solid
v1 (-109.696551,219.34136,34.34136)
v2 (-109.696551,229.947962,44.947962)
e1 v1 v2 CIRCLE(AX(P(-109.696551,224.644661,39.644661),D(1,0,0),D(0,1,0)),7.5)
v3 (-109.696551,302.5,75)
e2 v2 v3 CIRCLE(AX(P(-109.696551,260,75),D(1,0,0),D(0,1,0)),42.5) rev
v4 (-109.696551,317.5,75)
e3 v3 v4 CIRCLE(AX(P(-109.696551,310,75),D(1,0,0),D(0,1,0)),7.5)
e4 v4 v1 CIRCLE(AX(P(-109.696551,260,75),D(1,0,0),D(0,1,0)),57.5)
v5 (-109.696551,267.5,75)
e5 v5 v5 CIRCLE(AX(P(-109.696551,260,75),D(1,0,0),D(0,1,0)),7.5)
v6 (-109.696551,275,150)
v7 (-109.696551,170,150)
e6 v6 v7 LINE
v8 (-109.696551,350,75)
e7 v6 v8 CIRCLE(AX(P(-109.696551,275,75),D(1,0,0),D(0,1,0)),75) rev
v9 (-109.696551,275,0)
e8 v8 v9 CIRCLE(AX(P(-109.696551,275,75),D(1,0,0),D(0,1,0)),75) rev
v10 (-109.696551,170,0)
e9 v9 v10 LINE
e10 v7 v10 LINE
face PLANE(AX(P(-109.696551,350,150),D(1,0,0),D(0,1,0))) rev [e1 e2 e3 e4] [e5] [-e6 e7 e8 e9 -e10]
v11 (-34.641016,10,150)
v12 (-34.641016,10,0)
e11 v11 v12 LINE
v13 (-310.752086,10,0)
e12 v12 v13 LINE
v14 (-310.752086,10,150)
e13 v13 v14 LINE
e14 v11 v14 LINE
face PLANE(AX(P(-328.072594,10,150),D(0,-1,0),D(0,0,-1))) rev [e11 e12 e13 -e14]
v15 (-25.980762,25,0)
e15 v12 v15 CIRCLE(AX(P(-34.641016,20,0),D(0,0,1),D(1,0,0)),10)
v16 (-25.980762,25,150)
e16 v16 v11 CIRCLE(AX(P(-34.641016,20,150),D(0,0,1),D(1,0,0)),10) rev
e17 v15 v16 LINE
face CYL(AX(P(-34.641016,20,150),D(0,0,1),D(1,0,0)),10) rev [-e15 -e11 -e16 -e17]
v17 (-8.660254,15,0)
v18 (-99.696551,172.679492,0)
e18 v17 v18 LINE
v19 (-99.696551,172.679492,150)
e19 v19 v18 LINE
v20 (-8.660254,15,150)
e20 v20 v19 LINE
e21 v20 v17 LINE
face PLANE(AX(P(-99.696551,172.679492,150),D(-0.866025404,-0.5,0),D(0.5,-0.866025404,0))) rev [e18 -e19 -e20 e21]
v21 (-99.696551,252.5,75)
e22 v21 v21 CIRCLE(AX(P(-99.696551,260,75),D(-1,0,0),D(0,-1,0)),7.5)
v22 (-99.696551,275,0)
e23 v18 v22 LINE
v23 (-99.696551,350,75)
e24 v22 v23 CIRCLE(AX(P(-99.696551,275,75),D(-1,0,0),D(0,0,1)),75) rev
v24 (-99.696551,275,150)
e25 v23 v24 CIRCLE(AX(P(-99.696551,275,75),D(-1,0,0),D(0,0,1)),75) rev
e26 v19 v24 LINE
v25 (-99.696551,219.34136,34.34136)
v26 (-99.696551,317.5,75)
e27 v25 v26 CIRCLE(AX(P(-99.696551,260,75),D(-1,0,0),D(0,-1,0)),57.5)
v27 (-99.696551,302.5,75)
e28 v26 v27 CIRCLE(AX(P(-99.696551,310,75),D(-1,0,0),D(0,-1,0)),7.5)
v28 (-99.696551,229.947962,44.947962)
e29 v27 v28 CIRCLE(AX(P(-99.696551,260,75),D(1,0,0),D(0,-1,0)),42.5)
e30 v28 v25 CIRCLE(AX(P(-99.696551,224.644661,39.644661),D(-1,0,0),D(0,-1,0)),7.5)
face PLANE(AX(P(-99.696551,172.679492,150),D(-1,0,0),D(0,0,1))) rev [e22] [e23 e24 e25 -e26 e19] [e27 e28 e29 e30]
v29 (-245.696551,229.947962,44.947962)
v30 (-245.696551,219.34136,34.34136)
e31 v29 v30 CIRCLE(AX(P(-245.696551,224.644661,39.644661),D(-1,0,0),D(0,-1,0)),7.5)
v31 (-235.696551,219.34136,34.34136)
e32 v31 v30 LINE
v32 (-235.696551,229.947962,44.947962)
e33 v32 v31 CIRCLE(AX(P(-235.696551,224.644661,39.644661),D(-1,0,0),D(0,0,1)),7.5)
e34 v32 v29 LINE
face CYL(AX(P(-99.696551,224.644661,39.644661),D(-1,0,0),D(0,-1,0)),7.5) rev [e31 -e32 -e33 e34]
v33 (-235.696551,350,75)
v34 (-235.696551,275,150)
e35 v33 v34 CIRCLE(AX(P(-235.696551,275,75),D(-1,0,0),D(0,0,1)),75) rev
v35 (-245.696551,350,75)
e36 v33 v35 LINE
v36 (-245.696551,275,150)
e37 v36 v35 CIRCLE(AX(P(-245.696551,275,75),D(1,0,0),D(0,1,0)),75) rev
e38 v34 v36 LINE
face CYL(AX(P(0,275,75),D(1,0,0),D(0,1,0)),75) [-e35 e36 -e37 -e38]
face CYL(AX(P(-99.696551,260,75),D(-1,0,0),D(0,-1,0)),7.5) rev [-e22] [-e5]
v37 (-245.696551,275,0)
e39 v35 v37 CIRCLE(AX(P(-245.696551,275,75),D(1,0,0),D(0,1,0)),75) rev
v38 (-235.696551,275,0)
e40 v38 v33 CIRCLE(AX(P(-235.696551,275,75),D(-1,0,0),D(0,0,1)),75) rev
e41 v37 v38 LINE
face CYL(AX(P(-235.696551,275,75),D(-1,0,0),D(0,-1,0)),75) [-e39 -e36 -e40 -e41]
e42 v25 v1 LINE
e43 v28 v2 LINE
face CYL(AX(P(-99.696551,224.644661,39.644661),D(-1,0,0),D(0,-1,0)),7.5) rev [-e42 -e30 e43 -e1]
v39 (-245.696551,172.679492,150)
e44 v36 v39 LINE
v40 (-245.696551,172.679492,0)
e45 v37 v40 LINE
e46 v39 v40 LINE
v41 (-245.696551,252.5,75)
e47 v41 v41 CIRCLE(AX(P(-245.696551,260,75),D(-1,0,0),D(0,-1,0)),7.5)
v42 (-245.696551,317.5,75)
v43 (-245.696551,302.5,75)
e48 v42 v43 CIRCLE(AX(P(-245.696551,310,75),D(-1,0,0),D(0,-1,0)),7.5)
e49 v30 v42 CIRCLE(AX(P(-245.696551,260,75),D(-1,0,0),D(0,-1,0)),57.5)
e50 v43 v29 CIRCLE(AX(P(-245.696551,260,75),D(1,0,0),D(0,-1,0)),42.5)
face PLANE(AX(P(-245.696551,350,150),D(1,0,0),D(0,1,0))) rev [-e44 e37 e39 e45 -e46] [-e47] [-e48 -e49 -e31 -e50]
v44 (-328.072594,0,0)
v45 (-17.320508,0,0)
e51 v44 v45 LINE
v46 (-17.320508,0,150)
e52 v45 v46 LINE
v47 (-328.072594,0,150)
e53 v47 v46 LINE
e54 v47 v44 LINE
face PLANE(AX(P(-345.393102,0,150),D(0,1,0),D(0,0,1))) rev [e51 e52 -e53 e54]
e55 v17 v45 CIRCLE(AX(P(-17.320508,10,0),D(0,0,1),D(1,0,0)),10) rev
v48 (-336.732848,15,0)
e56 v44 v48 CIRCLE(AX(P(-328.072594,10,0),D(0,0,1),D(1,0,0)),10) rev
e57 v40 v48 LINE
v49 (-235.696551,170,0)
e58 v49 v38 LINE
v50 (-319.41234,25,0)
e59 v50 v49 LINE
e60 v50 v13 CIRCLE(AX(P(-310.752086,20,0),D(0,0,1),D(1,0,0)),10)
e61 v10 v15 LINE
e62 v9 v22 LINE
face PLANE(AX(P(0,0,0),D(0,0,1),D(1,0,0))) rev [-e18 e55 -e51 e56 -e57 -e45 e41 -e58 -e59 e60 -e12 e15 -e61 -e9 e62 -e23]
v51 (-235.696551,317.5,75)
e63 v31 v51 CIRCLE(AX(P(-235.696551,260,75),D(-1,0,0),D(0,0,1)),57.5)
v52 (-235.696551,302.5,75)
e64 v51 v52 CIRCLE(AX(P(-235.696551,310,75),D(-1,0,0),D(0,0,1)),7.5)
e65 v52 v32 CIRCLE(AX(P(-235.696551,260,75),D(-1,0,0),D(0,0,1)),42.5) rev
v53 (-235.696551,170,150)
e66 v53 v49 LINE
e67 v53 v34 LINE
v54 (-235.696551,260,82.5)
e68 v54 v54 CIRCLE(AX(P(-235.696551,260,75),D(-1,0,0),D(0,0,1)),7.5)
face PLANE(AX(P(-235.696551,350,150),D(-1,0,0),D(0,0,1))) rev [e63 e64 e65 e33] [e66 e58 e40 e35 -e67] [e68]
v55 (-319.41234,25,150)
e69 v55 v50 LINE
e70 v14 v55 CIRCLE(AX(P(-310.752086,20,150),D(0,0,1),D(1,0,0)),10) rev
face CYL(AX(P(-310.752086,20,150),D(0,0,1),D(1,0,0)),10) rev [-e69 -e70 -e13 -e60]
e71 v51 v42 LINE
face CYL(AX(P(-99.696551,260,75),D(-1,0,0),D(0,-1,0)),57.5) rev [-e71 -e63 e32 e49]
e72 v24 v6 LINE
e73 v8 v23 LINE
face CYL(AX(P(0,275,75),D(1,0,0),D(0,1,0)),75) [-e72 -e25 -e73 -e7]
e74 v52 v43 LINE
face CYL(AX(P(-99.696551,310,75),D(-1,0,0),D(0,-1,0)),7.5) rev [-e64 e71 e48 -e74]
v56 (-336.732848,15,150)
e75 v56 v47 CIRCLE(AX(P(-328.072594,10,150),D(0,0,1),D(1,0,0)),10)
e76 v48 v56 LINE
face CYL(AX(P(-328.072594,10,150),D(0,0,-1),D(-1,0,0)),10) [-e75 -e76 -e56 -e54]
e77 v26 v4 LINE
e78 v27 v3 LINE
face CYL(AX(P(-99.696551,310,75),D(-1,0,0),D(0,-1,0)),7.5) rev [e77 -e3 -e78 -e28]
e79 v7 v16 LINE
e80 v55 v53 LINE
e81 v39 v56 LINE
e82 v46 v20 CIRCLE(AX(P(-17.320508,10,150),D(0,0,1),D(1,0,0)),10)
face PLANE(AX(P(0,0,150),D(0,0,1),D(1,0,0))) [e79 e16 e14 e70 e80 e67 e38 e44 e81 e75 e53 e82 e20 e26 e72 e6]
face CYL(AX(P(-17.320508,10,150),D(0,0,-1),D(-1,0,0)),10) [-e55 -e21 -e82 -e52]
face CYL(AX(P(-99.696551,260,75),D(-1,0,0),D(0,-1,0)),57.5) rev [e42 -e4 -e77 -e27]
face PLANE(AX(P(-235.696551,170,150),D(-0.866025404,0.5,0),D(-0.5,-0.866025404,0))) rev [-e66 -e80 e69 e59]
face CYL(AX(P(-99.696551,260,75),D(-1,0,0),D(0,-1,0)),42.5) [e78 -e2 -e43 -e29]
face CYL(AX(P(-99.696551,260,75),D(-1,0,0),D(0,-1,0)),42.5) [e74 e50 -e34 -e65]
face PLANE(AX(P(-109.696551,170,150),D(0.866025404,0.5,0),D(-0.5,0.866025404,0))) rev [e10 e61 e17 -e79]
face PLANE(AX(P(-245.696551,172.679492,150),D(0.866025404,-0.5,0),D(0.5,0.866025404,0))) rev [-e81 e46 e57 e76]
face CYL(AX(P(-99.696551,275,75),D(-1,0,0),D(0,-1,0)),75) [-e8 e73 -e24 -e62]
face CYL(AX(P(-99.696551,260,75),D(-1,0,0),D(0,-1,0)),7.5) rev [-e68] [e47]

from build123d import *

# Parameters (mm, degrees)
SALIENTE_EXTRUIR1_DEPTH = 150
CROQUIS2_R              = 7.5
CORTAR_EXTRUIR1_DEPTH   = 146
REDONDEO1_R             = 75
REDONDEO2_R             = 10


with BuildPart() as part:
    # Croquis1 → Saliente-Extruir1 (new body)
    with BuildSketch(Plane.XY):
        Polygon((-245.696551146, 350), (-245.696551146, 172.679491924), (-345.393102292, 0), (0, 0), (-99.696551146, 172.679491924), (-99.696551146, 350), (-109.696551146, 350), (-109.696551146, 170), (-17.320508076, 10), (-328.072594216, 10), (-235.696551146, 170), (-235.696551146, 350), align=None)
    extrude(amount=SALIENTE_EXTRUIR1_DEPTH)

    # Croquis2 → Cortar-Extruir1 (cut)
    with BuildSketch(Plane.ZY.offset(245.696551146)):
        with Locations(Location((75, 260, 0), (0, 0, 270))):
            Circle(CROQUIS2_R)
        with BuildLine():
            ThreePointArc((34.341360082, 219.341360082), (128.123073119, 237.995702639), (75, 317.5))
            ThreePointArc((75, 317.5), (67.5, 310), (75, 302.5))
            ThreePointArc((75, 302.5), (114.264880132, 243.735954124), (44.9479618, 229.9479618))
            ThreePointArc((44.9479618, 229.9479618), (34.341360082, 229.9479618), (34.341360082, 219.341360082))
        make_face()
    extrude(amount=-CORTAR_EXTRUIR1_DEPTH, mode=Mode.SUBTRACT)

    # Redondeo1
    redondeo1_edges = [part.edges().sort_by_distance(p)[0] for p in [
        (-104.696551146, 350, 0),
        (-104.696551146, 350, 150),
        (-240.696551146, 350, 150),
        (-240.696551146, 350, 0),
    ]]
    fillet(redondeo1_edges, radius=REDONDEO1_R - 0.0001)  # a hair under: the kernel refuses the full size

    # Redondeo2
    redondeo2_edges = [part.edges().sort_by_distance(p)[0] for p in [
        (-328.072594216, 10, 75),
        (-17.320508076, 10, 75),
        (0, 0, 75),
        (-345.393102292, 0, 75),
    ]]
    fillet(redondeo2_edges, radius=REDONDEO2_R)


solid = part.part
